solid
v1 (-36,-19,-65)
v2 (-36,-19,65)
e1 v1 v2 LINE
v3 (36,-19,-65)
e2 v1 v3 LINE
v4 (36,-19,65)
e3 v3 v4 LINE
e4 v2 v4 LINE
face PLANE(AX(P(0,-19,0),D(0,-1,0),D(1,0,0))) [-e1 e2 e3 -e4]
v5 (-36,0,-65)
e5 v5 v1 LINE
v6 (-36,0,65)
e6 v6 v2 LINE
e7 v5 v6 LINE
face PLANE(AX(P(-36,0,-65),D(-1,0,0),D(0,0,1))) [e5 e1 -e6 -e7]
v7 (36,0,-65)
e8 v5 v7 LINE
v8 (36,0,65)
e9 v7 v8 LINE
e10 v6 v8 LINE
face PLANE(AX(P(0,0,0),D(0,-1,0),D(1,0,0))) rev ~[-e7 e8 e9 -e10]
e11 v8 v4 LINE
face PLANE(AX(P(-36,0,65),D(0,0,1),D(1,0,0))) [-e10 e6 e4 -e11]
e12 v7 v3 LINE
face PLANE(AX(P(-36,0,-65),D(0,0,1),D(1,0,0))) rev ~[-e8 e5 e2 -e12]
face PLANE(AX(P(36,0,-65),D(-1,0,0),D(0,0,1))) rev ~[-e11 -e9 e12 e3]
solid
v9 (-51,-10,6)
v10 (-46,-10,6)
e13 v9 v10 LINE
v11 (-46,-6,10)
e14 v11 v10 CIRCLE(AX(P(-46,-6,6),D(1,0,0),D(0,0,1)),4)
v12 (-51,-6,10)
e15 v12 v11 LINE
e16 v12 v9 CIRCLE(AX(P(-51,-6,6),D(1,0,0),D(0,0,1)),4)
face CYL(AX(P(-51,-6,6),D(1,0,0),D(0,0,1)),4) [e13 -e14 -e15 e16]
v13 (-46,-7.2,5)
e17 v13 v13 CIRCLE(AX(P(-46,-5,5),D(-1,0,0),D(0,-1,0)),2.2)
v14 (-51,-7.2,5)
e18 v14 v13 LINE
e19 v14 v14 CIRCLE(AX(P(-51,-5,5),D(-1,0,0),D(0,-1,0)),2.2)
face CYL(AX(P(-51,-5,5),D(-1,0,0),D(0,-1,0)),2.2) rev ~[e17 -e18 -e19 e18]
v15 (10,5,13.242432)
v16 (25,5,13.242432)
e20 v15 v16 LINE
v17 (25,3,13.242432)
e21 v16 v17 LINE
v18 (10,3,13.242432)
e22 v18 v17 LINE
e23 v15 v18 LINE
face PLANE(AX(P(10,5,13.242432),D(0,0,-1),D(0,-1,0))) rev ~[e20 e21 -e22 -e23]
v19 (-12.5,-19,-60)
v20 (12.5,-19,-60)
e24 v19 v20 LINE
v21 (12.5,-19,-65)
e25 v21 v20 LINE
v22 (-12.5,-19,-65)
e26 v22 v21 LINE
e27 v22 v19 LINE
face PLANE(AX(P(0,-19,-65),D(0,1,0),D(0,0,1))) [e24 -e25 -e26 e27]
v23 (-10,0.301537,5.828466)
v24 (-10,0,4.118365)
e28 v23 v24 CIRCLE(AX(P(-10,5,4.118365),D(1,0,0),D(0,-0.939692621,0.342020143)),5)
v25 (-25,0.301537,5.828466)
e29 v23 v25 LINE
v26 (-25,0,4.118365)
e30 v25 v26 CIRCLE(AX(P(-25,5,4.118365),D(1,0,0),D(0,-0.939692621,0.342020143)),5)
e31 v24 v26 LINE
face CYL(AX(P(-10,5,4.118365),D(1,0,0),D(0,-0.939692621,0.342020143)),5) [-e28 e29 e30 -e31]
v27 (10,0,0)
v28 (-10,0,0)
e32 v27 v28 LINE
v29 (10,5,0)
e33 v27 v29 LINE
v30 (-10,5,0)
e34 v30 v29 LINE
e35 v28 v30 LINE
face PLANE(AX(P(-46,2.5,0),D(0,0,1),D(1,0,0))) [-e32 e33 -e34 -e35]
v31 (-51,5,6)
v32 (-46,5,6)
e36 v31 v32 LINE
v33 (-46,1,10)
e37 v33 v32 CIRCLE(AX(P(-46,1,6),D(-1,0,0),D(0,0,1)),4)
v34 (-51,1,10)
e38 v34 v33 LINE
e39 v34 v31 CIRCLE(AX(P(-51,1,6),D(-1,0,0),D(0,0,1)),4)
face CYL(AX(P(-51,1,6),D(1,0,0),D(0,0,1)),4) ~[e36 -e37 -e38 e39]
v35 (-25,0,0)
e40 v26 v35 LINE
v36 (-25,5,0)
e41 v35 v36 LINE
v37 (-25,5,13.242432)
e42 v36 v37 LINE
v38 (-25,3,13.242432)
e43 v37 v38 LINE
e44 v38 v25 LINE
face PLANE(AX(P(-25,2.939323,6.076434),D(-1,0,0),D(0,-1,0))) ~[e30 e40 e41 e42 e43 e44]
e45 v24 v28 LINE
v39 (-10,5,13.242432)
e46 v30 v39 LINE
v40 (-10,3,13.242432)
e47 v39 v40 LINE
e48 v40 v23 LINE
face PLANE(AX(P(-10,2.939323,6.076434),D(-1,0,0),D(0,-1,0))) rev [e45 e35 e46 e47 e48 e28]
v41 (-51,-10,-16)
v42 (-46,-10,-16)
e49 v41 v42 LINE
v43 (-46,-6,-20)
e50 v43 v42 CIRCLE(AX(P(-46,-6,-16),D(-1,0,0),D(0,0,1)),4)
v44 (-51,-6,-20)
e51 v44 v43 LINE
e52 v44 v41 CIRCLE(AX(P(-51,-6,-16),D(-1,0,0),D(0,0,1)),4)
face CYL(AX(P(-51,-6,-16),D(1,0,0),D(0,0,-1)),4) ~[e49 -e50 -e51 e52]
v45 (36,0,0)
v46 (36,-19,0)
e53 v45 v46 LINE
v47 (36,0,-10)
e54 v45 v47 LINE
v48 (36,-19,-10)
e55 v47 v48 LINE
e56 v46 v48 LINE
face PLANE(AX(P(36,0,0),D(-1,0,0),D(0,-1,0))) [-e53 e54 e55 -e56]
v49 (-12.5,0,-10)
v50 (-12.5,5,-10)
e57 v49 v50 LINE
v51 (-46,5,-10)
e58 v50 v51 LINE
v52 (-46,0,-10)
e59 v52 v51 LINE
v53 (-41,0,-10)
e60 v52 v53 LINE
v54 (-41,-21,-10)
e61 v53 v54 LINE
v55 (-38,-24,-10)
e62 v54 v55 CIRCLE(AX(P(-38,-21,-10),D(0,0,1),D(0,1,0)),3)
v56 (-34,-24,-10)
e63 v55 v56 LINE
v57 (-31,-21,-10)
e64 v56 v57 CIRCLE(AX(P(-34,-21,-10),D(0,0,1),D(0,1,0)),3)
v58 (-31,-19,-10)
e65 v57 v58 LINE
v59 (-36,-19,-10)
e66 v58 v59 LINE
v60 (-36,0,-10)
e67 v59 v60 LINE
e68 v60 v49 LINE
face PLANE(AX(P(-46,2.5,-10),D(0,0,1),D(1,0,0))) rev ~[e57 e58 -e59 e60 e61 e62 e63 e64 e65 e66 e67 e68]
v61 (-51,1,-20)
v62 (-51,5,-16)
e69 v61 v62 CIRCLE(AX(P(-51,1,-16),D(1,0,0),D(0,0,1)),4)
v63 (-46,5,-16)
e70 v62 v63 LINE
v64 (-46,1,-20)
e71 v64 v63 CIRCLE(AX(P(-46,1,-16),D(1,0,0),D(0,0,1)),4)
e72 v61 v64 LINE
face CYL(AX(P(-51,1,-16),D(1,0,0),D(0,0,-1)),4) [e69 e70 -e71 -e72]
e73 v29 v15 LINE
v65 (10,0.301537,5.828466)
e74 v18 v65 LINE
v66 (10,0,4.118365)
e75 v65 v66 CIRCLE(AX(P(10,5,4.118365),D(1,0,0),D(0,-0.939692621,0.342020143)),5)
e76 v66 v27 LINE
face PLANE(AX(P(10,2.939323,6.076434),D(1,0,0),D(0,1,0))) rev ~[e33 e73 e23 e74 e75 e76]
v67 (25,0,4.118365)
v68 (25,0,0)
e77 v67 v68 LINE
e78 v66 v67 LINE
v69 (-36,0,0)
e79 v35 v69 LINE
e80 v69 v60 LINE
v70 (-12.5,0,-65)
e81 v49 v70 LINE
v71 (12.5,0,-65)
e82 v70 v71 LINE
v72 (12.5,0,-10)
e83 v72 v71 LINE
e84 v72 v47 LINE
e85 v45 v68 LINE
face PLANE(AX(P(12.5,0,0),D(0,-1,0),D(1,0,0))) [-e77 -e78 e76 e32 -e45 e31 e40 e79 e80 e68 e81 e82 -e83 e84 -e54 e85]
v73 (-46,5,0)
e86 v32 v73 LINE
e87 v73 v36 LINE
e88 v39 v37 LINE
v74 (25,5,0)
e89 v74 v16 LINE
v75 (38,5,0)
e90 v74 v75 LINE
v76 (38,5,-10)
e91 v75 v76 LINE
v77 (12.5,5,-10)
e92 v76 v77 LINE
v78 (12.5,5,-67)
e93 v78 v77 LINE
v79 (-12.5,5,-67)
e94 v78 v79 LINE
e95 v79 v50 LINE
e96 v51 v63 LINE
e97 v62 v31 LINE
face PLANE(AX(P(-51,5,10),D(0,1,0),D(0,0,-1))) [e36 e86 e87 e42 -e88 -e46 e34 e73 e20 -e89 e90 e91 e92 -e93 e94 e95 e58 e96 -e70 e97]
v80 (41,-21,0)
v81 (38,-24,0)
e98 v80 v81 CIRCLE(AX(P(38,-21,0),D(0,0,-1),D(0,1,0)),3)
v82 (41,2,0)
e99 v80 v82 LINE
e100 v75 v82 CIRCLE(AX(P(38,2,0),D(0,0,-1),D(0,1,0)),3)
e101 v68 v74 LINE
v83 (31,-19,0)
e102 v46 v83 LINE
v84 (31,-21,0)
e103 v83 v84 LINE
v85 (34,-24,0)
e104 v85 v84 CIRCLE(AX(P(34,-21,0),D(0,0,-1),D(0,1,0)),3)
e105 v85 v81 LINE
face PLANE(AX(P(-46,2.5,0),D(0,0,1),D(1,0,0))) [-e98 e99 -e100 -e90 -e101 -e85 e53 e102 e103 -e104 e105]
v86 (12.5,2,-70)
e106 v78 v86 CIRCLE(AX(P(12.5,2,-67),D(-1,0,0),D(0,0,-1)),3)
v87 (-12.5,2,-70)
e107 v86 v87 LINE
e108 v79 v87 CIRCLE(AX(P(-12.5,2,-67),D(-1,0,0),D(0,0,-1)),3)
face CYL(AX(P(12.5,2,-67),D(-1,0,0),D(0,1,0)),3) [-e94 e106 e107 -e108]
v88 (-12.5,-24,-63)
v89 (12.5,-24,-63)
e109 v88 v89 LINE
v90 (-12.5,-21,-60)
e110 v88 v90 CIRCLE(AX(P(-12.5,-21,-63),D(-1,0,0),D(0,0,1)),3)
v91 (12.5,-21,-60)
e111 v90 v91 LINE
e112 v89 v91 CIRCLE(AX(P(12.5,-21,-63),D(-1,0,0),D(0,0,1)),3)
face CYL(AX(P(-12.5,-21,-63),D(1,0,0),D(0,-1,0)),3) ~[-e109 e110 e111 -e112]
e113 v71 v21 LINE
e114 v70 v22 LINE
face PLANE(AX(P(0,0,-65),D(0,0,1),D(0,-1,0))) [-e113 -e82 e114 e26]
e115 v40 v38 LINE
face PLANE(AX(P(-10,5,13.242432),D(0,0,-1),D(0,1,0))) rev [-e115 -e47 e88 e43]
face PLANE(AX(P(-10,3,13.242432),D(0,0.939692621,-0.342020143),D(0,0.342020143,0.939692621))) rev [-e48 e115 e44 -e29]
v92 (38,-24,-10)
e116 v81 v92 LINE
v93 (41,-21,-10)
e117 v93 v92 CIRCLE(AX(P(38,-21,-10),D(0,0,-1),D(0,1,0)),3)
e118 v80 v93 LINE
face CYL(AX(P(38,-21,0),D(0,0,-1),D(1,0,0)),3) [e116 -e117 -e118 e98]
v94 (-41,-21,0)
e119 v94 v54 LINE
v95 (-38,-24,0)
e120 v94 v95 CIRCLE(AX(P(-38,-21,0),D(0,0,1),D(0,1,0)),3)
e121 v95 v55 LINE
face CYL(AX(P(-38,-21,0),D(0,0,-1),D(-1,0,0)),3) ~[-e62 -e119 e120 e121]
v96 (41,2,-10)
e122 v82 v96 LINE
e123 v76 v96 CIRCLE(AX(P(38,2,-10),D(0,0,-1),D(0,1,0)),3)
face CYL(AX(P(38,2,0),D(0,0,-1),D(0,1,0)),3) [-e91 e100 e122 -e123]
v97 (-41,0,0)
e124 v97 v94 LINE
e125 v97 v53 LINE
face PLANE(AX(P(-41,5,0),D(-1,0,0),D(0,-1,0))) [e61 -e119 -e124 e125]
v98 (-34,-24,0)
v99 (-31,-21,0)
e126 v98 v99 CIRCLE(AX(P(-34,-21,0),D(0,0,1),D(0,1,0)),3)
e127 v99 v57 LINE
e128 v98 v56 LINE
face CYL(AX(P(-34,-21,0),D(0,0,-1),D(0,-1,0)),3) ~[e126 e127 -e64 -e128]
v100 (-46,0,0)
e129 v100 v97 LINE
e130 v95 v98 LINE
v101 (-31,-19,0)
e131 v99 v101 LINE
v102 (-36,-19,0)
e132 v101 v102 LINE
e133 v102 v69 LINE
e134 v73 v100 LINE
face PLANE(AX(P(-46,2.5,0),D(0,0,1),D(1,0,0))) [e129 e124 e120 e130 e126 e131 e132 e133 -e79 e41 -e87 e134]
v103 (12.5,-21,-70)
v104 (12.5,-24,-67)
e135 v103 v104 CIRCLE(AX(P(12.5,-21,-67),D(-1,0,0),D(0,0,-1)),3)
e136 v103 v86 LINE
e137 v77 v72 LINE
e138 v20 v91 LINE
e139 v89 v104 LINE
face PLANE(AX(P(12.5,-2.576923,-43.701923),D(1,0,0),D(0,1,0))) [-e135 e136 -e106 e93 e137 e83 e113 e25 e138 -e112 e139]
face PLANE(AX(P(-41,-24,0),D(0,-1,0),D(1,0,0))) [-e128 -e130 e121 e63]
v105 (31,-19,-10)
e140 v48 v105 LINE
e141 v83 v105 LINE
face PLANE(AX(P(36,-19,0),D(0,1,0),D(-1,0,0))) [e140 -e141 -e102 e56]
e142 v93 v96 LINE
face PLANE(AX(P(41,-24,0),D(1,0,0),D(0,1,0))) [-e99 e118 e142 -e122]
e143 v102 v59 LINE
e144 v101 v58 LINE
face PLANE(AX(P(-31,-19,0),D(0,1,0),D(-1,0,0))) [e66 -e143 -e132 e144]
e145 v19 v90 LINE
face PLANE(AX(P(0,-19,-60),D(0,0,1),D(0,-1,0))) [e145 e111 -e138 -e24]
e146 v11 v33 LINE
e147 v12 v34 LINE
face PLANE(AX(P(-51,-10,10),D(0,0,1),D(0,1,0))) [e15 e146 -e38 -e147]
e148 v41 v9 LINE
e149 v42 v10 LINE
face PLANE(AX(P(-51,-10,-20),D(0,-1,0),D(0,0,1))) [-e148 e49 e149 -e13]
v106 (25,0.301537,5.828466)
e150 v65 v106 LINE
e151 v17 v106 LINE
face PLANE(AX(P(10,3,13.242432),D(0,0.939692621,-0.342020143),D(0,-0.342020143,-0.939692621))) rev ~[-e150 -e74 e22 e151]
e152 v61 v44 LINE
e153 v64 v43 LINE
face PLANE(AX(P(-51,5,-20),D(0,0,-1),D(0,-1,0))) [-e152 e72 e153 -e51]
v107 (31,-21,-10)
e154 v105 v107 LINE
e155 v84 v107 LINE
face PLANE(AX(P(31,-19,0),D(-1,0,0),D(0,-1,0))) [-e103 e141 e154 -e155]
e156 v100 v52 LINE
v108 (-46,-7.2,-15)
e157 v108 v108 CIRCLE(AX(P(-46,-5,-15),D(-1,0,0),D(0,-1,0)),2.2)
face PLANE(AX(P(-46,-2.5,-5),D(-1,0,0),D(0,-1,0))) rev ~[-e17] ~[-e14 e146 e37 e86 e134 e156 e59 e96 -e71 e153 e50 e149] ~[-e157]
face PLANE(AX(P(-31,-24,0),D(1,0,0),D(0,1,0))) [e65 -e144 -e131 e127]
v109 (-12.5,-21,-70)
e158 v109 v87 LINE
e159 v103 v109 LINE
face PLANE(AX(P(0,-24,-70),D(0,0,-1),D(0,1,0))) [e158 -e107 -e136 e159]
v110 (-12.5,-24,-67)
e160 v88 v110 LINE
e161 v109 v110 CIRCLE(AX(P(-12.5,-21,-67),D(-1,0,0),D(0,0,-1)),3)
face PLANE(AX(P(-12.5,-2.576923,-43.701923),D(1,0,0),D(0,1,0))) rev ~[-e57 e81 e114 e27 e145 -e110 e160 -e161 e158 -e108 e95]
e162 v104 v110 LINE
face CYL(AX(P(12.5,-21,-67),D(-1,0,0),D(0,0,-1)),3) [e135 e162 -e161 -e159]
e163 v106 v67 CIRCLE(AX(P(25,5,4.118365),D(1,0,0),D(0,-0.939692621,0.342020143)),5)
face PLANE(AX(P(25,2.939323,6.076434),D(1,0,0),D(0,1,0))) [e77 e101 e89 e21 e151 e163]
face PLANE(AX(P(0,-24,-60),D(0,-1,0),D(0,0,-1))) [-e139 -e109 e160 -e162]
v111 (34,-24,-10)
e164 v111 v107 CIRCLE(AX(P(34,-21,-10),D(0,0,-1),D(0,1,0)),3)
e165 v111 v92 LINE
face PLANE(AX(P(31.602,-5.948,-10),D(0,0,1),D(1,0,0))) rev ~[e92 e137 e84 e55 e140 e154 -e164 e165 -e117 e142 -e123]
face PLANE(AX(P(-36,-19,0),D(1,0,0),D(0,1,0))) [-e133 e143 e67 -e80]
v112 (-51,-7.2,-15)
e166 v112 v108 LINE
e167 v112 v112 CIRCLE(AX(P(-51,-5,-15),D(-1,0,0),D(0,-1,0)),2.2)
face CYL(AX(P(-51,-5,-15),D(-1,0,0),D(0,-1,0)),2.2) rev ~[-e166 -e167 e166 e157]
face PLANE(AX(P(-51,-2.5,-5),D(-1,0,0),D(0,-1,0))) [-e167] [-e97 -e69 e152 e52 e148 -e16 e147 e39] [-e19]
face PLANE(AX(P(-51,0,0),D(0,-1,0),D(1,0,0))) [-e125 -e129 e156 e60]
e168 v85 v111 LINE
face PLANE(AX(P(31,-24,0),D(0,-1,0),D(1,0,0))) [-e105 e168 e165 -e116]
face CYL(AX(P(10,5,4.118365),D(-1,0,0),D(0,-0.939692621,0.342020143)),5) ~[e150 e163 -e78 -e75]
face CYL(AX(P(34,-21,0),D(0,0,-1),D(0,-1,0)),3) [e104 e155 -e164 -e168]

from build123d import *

# Parameters (mm, degrees)
F0_W      = 72
F0_H      = 130
F1_DEPTH  = 19
F3_DEPTH  = 12.5
F4_R      = 3
F6_DEPTH  = 10
F7_R      = 3
F8_W      = 10
F8_H      = 5
F9_DEPTH  = 10
F10_R     = 2.2
F11_DEPTH = 5
F12_R     = 4
F14_START = 10
F14_DEPTH = 15


# Not quite as in the source:
# - a pattern or mirror of a feature is missing from the dataset's text; its kind, count and spacing are read off the source's solid


with BuildPart() as f1:
    # F0 (on Front) → F1 (new body)
    with BuildSketch(Plane.XZ):
        Rectangle(F0_W, F0_H)
    extrude(amount=F1_DEPTH)


with BuildPart() as f3:
    # F2 (on Right) → F3 (new body, symmetric)
    with BuildSketch(Plane.YZ):
        Polygon((5, 0), (0, 0), (0, -65), (-19, -65), (-19, -60), (-24, -60), (-24, -70), (5, -70), align=None)
    extrude(amount=F3_DEPTH, both=True)

    # F4
    f4_edges = [f3.edges().sort_by_distance(p)[0] for p in [
        (0, -24, -60),
        (0, -24, -70),
        (0, 5, -70),
    ]]
    fillet(f4_edges, radius=F4_R)

    # F5 (on Top) → F6 (join)
    with BuildSketch(Plane.XY):
        Polygon((12.5, 5), (12.5, 0), (36, 0), (36, -19), (31, -19), (31, -24), (41, -24), (41, 5), align=None)
        Polygon((-12.5, 0), (-12.5, 5), (-41, 5), (-41, -24), (-31, -24), (-31, -19), (-36, -19), (-36, 0), align=None)
    extrude(amount=-F6_DEPTH)

    # F7
    f7_edges = [f3.edges().sort_by_distance(p)[0] for p in [
        (31, -24, -5),
        (41, -24, -5),
        (41, 5, -5),
        (-41, -24, -5),
        (-31, -24, -5),
    ]]
    fillet(f7_edges, radius=F7_R)

    # F8 (on Top) → F9 (join, through all)
    with BuildSketch(Plane.XY):
        with Locations((-46, 2.5)):
            Rectangle(F8_W, F8_H)
    extrude(amount=-F9_DEPTH)

    # F10 (on face) → F11 (join)
    with BuildSketch(Plane(origin=(-51, 0, 0), x_dir=(0, -1, 0), z_dir=(-1, 0, 0))):
        Polygon((10, 10), (-5, 10), (-5, 0), (0, 0), (0, -10), (-5, -10), (-5, -20), (10, -20), align=None)
        with Locations((5, -15)):
            Circle(F10_R, mode=Mode.SUBTRACT)
        with Locations((5, 5)):
            Circle(F10_R, mode=Mode.SUBTRACT)
    extrude(amount=-F11_DEPTH)

    # F12
    f12_edges = [f3.edges().sort_by_distance(p)[0] for p in [
        (-48.5, -10, 10),
        (-48.5, -10, -20),
        (-48.5, 5, 10),
        (-48.5, 5, -20),
    ]]
    fillet(f12_edges, radius=F12_R)

    # F13 (on Right) → F14 (join)
    with BuildSketch(Plane.YZ.offset(F14_START)):
        with BuildLine():
            Line((0, 4.1183650965), (0, 0))
            Line((0, 0), (5, 0))
            Line((5, 0), (5, 13.2424322584))
            Line((5, 13.2424322584), (3, 13.2424322584))
            Line((3, 13.2424322584), (0.3015368961, 5.8284658131))
            ThreePointArc((0.3015368961, 5.8284658131), (0.0759612349, 4.9866059848), (0, 4.1183650965))
        make_face()
    f14 = extrude(amount=F14_DEPTH)

    # F14_copies: F14 across plane
    add(f14.mirror(Plane(origin=(0, 0, 0), x_dir=(0, 0, -1), z_dir=(-1, 0, 0))))


solid = Compound([f1.part, f3.part])
